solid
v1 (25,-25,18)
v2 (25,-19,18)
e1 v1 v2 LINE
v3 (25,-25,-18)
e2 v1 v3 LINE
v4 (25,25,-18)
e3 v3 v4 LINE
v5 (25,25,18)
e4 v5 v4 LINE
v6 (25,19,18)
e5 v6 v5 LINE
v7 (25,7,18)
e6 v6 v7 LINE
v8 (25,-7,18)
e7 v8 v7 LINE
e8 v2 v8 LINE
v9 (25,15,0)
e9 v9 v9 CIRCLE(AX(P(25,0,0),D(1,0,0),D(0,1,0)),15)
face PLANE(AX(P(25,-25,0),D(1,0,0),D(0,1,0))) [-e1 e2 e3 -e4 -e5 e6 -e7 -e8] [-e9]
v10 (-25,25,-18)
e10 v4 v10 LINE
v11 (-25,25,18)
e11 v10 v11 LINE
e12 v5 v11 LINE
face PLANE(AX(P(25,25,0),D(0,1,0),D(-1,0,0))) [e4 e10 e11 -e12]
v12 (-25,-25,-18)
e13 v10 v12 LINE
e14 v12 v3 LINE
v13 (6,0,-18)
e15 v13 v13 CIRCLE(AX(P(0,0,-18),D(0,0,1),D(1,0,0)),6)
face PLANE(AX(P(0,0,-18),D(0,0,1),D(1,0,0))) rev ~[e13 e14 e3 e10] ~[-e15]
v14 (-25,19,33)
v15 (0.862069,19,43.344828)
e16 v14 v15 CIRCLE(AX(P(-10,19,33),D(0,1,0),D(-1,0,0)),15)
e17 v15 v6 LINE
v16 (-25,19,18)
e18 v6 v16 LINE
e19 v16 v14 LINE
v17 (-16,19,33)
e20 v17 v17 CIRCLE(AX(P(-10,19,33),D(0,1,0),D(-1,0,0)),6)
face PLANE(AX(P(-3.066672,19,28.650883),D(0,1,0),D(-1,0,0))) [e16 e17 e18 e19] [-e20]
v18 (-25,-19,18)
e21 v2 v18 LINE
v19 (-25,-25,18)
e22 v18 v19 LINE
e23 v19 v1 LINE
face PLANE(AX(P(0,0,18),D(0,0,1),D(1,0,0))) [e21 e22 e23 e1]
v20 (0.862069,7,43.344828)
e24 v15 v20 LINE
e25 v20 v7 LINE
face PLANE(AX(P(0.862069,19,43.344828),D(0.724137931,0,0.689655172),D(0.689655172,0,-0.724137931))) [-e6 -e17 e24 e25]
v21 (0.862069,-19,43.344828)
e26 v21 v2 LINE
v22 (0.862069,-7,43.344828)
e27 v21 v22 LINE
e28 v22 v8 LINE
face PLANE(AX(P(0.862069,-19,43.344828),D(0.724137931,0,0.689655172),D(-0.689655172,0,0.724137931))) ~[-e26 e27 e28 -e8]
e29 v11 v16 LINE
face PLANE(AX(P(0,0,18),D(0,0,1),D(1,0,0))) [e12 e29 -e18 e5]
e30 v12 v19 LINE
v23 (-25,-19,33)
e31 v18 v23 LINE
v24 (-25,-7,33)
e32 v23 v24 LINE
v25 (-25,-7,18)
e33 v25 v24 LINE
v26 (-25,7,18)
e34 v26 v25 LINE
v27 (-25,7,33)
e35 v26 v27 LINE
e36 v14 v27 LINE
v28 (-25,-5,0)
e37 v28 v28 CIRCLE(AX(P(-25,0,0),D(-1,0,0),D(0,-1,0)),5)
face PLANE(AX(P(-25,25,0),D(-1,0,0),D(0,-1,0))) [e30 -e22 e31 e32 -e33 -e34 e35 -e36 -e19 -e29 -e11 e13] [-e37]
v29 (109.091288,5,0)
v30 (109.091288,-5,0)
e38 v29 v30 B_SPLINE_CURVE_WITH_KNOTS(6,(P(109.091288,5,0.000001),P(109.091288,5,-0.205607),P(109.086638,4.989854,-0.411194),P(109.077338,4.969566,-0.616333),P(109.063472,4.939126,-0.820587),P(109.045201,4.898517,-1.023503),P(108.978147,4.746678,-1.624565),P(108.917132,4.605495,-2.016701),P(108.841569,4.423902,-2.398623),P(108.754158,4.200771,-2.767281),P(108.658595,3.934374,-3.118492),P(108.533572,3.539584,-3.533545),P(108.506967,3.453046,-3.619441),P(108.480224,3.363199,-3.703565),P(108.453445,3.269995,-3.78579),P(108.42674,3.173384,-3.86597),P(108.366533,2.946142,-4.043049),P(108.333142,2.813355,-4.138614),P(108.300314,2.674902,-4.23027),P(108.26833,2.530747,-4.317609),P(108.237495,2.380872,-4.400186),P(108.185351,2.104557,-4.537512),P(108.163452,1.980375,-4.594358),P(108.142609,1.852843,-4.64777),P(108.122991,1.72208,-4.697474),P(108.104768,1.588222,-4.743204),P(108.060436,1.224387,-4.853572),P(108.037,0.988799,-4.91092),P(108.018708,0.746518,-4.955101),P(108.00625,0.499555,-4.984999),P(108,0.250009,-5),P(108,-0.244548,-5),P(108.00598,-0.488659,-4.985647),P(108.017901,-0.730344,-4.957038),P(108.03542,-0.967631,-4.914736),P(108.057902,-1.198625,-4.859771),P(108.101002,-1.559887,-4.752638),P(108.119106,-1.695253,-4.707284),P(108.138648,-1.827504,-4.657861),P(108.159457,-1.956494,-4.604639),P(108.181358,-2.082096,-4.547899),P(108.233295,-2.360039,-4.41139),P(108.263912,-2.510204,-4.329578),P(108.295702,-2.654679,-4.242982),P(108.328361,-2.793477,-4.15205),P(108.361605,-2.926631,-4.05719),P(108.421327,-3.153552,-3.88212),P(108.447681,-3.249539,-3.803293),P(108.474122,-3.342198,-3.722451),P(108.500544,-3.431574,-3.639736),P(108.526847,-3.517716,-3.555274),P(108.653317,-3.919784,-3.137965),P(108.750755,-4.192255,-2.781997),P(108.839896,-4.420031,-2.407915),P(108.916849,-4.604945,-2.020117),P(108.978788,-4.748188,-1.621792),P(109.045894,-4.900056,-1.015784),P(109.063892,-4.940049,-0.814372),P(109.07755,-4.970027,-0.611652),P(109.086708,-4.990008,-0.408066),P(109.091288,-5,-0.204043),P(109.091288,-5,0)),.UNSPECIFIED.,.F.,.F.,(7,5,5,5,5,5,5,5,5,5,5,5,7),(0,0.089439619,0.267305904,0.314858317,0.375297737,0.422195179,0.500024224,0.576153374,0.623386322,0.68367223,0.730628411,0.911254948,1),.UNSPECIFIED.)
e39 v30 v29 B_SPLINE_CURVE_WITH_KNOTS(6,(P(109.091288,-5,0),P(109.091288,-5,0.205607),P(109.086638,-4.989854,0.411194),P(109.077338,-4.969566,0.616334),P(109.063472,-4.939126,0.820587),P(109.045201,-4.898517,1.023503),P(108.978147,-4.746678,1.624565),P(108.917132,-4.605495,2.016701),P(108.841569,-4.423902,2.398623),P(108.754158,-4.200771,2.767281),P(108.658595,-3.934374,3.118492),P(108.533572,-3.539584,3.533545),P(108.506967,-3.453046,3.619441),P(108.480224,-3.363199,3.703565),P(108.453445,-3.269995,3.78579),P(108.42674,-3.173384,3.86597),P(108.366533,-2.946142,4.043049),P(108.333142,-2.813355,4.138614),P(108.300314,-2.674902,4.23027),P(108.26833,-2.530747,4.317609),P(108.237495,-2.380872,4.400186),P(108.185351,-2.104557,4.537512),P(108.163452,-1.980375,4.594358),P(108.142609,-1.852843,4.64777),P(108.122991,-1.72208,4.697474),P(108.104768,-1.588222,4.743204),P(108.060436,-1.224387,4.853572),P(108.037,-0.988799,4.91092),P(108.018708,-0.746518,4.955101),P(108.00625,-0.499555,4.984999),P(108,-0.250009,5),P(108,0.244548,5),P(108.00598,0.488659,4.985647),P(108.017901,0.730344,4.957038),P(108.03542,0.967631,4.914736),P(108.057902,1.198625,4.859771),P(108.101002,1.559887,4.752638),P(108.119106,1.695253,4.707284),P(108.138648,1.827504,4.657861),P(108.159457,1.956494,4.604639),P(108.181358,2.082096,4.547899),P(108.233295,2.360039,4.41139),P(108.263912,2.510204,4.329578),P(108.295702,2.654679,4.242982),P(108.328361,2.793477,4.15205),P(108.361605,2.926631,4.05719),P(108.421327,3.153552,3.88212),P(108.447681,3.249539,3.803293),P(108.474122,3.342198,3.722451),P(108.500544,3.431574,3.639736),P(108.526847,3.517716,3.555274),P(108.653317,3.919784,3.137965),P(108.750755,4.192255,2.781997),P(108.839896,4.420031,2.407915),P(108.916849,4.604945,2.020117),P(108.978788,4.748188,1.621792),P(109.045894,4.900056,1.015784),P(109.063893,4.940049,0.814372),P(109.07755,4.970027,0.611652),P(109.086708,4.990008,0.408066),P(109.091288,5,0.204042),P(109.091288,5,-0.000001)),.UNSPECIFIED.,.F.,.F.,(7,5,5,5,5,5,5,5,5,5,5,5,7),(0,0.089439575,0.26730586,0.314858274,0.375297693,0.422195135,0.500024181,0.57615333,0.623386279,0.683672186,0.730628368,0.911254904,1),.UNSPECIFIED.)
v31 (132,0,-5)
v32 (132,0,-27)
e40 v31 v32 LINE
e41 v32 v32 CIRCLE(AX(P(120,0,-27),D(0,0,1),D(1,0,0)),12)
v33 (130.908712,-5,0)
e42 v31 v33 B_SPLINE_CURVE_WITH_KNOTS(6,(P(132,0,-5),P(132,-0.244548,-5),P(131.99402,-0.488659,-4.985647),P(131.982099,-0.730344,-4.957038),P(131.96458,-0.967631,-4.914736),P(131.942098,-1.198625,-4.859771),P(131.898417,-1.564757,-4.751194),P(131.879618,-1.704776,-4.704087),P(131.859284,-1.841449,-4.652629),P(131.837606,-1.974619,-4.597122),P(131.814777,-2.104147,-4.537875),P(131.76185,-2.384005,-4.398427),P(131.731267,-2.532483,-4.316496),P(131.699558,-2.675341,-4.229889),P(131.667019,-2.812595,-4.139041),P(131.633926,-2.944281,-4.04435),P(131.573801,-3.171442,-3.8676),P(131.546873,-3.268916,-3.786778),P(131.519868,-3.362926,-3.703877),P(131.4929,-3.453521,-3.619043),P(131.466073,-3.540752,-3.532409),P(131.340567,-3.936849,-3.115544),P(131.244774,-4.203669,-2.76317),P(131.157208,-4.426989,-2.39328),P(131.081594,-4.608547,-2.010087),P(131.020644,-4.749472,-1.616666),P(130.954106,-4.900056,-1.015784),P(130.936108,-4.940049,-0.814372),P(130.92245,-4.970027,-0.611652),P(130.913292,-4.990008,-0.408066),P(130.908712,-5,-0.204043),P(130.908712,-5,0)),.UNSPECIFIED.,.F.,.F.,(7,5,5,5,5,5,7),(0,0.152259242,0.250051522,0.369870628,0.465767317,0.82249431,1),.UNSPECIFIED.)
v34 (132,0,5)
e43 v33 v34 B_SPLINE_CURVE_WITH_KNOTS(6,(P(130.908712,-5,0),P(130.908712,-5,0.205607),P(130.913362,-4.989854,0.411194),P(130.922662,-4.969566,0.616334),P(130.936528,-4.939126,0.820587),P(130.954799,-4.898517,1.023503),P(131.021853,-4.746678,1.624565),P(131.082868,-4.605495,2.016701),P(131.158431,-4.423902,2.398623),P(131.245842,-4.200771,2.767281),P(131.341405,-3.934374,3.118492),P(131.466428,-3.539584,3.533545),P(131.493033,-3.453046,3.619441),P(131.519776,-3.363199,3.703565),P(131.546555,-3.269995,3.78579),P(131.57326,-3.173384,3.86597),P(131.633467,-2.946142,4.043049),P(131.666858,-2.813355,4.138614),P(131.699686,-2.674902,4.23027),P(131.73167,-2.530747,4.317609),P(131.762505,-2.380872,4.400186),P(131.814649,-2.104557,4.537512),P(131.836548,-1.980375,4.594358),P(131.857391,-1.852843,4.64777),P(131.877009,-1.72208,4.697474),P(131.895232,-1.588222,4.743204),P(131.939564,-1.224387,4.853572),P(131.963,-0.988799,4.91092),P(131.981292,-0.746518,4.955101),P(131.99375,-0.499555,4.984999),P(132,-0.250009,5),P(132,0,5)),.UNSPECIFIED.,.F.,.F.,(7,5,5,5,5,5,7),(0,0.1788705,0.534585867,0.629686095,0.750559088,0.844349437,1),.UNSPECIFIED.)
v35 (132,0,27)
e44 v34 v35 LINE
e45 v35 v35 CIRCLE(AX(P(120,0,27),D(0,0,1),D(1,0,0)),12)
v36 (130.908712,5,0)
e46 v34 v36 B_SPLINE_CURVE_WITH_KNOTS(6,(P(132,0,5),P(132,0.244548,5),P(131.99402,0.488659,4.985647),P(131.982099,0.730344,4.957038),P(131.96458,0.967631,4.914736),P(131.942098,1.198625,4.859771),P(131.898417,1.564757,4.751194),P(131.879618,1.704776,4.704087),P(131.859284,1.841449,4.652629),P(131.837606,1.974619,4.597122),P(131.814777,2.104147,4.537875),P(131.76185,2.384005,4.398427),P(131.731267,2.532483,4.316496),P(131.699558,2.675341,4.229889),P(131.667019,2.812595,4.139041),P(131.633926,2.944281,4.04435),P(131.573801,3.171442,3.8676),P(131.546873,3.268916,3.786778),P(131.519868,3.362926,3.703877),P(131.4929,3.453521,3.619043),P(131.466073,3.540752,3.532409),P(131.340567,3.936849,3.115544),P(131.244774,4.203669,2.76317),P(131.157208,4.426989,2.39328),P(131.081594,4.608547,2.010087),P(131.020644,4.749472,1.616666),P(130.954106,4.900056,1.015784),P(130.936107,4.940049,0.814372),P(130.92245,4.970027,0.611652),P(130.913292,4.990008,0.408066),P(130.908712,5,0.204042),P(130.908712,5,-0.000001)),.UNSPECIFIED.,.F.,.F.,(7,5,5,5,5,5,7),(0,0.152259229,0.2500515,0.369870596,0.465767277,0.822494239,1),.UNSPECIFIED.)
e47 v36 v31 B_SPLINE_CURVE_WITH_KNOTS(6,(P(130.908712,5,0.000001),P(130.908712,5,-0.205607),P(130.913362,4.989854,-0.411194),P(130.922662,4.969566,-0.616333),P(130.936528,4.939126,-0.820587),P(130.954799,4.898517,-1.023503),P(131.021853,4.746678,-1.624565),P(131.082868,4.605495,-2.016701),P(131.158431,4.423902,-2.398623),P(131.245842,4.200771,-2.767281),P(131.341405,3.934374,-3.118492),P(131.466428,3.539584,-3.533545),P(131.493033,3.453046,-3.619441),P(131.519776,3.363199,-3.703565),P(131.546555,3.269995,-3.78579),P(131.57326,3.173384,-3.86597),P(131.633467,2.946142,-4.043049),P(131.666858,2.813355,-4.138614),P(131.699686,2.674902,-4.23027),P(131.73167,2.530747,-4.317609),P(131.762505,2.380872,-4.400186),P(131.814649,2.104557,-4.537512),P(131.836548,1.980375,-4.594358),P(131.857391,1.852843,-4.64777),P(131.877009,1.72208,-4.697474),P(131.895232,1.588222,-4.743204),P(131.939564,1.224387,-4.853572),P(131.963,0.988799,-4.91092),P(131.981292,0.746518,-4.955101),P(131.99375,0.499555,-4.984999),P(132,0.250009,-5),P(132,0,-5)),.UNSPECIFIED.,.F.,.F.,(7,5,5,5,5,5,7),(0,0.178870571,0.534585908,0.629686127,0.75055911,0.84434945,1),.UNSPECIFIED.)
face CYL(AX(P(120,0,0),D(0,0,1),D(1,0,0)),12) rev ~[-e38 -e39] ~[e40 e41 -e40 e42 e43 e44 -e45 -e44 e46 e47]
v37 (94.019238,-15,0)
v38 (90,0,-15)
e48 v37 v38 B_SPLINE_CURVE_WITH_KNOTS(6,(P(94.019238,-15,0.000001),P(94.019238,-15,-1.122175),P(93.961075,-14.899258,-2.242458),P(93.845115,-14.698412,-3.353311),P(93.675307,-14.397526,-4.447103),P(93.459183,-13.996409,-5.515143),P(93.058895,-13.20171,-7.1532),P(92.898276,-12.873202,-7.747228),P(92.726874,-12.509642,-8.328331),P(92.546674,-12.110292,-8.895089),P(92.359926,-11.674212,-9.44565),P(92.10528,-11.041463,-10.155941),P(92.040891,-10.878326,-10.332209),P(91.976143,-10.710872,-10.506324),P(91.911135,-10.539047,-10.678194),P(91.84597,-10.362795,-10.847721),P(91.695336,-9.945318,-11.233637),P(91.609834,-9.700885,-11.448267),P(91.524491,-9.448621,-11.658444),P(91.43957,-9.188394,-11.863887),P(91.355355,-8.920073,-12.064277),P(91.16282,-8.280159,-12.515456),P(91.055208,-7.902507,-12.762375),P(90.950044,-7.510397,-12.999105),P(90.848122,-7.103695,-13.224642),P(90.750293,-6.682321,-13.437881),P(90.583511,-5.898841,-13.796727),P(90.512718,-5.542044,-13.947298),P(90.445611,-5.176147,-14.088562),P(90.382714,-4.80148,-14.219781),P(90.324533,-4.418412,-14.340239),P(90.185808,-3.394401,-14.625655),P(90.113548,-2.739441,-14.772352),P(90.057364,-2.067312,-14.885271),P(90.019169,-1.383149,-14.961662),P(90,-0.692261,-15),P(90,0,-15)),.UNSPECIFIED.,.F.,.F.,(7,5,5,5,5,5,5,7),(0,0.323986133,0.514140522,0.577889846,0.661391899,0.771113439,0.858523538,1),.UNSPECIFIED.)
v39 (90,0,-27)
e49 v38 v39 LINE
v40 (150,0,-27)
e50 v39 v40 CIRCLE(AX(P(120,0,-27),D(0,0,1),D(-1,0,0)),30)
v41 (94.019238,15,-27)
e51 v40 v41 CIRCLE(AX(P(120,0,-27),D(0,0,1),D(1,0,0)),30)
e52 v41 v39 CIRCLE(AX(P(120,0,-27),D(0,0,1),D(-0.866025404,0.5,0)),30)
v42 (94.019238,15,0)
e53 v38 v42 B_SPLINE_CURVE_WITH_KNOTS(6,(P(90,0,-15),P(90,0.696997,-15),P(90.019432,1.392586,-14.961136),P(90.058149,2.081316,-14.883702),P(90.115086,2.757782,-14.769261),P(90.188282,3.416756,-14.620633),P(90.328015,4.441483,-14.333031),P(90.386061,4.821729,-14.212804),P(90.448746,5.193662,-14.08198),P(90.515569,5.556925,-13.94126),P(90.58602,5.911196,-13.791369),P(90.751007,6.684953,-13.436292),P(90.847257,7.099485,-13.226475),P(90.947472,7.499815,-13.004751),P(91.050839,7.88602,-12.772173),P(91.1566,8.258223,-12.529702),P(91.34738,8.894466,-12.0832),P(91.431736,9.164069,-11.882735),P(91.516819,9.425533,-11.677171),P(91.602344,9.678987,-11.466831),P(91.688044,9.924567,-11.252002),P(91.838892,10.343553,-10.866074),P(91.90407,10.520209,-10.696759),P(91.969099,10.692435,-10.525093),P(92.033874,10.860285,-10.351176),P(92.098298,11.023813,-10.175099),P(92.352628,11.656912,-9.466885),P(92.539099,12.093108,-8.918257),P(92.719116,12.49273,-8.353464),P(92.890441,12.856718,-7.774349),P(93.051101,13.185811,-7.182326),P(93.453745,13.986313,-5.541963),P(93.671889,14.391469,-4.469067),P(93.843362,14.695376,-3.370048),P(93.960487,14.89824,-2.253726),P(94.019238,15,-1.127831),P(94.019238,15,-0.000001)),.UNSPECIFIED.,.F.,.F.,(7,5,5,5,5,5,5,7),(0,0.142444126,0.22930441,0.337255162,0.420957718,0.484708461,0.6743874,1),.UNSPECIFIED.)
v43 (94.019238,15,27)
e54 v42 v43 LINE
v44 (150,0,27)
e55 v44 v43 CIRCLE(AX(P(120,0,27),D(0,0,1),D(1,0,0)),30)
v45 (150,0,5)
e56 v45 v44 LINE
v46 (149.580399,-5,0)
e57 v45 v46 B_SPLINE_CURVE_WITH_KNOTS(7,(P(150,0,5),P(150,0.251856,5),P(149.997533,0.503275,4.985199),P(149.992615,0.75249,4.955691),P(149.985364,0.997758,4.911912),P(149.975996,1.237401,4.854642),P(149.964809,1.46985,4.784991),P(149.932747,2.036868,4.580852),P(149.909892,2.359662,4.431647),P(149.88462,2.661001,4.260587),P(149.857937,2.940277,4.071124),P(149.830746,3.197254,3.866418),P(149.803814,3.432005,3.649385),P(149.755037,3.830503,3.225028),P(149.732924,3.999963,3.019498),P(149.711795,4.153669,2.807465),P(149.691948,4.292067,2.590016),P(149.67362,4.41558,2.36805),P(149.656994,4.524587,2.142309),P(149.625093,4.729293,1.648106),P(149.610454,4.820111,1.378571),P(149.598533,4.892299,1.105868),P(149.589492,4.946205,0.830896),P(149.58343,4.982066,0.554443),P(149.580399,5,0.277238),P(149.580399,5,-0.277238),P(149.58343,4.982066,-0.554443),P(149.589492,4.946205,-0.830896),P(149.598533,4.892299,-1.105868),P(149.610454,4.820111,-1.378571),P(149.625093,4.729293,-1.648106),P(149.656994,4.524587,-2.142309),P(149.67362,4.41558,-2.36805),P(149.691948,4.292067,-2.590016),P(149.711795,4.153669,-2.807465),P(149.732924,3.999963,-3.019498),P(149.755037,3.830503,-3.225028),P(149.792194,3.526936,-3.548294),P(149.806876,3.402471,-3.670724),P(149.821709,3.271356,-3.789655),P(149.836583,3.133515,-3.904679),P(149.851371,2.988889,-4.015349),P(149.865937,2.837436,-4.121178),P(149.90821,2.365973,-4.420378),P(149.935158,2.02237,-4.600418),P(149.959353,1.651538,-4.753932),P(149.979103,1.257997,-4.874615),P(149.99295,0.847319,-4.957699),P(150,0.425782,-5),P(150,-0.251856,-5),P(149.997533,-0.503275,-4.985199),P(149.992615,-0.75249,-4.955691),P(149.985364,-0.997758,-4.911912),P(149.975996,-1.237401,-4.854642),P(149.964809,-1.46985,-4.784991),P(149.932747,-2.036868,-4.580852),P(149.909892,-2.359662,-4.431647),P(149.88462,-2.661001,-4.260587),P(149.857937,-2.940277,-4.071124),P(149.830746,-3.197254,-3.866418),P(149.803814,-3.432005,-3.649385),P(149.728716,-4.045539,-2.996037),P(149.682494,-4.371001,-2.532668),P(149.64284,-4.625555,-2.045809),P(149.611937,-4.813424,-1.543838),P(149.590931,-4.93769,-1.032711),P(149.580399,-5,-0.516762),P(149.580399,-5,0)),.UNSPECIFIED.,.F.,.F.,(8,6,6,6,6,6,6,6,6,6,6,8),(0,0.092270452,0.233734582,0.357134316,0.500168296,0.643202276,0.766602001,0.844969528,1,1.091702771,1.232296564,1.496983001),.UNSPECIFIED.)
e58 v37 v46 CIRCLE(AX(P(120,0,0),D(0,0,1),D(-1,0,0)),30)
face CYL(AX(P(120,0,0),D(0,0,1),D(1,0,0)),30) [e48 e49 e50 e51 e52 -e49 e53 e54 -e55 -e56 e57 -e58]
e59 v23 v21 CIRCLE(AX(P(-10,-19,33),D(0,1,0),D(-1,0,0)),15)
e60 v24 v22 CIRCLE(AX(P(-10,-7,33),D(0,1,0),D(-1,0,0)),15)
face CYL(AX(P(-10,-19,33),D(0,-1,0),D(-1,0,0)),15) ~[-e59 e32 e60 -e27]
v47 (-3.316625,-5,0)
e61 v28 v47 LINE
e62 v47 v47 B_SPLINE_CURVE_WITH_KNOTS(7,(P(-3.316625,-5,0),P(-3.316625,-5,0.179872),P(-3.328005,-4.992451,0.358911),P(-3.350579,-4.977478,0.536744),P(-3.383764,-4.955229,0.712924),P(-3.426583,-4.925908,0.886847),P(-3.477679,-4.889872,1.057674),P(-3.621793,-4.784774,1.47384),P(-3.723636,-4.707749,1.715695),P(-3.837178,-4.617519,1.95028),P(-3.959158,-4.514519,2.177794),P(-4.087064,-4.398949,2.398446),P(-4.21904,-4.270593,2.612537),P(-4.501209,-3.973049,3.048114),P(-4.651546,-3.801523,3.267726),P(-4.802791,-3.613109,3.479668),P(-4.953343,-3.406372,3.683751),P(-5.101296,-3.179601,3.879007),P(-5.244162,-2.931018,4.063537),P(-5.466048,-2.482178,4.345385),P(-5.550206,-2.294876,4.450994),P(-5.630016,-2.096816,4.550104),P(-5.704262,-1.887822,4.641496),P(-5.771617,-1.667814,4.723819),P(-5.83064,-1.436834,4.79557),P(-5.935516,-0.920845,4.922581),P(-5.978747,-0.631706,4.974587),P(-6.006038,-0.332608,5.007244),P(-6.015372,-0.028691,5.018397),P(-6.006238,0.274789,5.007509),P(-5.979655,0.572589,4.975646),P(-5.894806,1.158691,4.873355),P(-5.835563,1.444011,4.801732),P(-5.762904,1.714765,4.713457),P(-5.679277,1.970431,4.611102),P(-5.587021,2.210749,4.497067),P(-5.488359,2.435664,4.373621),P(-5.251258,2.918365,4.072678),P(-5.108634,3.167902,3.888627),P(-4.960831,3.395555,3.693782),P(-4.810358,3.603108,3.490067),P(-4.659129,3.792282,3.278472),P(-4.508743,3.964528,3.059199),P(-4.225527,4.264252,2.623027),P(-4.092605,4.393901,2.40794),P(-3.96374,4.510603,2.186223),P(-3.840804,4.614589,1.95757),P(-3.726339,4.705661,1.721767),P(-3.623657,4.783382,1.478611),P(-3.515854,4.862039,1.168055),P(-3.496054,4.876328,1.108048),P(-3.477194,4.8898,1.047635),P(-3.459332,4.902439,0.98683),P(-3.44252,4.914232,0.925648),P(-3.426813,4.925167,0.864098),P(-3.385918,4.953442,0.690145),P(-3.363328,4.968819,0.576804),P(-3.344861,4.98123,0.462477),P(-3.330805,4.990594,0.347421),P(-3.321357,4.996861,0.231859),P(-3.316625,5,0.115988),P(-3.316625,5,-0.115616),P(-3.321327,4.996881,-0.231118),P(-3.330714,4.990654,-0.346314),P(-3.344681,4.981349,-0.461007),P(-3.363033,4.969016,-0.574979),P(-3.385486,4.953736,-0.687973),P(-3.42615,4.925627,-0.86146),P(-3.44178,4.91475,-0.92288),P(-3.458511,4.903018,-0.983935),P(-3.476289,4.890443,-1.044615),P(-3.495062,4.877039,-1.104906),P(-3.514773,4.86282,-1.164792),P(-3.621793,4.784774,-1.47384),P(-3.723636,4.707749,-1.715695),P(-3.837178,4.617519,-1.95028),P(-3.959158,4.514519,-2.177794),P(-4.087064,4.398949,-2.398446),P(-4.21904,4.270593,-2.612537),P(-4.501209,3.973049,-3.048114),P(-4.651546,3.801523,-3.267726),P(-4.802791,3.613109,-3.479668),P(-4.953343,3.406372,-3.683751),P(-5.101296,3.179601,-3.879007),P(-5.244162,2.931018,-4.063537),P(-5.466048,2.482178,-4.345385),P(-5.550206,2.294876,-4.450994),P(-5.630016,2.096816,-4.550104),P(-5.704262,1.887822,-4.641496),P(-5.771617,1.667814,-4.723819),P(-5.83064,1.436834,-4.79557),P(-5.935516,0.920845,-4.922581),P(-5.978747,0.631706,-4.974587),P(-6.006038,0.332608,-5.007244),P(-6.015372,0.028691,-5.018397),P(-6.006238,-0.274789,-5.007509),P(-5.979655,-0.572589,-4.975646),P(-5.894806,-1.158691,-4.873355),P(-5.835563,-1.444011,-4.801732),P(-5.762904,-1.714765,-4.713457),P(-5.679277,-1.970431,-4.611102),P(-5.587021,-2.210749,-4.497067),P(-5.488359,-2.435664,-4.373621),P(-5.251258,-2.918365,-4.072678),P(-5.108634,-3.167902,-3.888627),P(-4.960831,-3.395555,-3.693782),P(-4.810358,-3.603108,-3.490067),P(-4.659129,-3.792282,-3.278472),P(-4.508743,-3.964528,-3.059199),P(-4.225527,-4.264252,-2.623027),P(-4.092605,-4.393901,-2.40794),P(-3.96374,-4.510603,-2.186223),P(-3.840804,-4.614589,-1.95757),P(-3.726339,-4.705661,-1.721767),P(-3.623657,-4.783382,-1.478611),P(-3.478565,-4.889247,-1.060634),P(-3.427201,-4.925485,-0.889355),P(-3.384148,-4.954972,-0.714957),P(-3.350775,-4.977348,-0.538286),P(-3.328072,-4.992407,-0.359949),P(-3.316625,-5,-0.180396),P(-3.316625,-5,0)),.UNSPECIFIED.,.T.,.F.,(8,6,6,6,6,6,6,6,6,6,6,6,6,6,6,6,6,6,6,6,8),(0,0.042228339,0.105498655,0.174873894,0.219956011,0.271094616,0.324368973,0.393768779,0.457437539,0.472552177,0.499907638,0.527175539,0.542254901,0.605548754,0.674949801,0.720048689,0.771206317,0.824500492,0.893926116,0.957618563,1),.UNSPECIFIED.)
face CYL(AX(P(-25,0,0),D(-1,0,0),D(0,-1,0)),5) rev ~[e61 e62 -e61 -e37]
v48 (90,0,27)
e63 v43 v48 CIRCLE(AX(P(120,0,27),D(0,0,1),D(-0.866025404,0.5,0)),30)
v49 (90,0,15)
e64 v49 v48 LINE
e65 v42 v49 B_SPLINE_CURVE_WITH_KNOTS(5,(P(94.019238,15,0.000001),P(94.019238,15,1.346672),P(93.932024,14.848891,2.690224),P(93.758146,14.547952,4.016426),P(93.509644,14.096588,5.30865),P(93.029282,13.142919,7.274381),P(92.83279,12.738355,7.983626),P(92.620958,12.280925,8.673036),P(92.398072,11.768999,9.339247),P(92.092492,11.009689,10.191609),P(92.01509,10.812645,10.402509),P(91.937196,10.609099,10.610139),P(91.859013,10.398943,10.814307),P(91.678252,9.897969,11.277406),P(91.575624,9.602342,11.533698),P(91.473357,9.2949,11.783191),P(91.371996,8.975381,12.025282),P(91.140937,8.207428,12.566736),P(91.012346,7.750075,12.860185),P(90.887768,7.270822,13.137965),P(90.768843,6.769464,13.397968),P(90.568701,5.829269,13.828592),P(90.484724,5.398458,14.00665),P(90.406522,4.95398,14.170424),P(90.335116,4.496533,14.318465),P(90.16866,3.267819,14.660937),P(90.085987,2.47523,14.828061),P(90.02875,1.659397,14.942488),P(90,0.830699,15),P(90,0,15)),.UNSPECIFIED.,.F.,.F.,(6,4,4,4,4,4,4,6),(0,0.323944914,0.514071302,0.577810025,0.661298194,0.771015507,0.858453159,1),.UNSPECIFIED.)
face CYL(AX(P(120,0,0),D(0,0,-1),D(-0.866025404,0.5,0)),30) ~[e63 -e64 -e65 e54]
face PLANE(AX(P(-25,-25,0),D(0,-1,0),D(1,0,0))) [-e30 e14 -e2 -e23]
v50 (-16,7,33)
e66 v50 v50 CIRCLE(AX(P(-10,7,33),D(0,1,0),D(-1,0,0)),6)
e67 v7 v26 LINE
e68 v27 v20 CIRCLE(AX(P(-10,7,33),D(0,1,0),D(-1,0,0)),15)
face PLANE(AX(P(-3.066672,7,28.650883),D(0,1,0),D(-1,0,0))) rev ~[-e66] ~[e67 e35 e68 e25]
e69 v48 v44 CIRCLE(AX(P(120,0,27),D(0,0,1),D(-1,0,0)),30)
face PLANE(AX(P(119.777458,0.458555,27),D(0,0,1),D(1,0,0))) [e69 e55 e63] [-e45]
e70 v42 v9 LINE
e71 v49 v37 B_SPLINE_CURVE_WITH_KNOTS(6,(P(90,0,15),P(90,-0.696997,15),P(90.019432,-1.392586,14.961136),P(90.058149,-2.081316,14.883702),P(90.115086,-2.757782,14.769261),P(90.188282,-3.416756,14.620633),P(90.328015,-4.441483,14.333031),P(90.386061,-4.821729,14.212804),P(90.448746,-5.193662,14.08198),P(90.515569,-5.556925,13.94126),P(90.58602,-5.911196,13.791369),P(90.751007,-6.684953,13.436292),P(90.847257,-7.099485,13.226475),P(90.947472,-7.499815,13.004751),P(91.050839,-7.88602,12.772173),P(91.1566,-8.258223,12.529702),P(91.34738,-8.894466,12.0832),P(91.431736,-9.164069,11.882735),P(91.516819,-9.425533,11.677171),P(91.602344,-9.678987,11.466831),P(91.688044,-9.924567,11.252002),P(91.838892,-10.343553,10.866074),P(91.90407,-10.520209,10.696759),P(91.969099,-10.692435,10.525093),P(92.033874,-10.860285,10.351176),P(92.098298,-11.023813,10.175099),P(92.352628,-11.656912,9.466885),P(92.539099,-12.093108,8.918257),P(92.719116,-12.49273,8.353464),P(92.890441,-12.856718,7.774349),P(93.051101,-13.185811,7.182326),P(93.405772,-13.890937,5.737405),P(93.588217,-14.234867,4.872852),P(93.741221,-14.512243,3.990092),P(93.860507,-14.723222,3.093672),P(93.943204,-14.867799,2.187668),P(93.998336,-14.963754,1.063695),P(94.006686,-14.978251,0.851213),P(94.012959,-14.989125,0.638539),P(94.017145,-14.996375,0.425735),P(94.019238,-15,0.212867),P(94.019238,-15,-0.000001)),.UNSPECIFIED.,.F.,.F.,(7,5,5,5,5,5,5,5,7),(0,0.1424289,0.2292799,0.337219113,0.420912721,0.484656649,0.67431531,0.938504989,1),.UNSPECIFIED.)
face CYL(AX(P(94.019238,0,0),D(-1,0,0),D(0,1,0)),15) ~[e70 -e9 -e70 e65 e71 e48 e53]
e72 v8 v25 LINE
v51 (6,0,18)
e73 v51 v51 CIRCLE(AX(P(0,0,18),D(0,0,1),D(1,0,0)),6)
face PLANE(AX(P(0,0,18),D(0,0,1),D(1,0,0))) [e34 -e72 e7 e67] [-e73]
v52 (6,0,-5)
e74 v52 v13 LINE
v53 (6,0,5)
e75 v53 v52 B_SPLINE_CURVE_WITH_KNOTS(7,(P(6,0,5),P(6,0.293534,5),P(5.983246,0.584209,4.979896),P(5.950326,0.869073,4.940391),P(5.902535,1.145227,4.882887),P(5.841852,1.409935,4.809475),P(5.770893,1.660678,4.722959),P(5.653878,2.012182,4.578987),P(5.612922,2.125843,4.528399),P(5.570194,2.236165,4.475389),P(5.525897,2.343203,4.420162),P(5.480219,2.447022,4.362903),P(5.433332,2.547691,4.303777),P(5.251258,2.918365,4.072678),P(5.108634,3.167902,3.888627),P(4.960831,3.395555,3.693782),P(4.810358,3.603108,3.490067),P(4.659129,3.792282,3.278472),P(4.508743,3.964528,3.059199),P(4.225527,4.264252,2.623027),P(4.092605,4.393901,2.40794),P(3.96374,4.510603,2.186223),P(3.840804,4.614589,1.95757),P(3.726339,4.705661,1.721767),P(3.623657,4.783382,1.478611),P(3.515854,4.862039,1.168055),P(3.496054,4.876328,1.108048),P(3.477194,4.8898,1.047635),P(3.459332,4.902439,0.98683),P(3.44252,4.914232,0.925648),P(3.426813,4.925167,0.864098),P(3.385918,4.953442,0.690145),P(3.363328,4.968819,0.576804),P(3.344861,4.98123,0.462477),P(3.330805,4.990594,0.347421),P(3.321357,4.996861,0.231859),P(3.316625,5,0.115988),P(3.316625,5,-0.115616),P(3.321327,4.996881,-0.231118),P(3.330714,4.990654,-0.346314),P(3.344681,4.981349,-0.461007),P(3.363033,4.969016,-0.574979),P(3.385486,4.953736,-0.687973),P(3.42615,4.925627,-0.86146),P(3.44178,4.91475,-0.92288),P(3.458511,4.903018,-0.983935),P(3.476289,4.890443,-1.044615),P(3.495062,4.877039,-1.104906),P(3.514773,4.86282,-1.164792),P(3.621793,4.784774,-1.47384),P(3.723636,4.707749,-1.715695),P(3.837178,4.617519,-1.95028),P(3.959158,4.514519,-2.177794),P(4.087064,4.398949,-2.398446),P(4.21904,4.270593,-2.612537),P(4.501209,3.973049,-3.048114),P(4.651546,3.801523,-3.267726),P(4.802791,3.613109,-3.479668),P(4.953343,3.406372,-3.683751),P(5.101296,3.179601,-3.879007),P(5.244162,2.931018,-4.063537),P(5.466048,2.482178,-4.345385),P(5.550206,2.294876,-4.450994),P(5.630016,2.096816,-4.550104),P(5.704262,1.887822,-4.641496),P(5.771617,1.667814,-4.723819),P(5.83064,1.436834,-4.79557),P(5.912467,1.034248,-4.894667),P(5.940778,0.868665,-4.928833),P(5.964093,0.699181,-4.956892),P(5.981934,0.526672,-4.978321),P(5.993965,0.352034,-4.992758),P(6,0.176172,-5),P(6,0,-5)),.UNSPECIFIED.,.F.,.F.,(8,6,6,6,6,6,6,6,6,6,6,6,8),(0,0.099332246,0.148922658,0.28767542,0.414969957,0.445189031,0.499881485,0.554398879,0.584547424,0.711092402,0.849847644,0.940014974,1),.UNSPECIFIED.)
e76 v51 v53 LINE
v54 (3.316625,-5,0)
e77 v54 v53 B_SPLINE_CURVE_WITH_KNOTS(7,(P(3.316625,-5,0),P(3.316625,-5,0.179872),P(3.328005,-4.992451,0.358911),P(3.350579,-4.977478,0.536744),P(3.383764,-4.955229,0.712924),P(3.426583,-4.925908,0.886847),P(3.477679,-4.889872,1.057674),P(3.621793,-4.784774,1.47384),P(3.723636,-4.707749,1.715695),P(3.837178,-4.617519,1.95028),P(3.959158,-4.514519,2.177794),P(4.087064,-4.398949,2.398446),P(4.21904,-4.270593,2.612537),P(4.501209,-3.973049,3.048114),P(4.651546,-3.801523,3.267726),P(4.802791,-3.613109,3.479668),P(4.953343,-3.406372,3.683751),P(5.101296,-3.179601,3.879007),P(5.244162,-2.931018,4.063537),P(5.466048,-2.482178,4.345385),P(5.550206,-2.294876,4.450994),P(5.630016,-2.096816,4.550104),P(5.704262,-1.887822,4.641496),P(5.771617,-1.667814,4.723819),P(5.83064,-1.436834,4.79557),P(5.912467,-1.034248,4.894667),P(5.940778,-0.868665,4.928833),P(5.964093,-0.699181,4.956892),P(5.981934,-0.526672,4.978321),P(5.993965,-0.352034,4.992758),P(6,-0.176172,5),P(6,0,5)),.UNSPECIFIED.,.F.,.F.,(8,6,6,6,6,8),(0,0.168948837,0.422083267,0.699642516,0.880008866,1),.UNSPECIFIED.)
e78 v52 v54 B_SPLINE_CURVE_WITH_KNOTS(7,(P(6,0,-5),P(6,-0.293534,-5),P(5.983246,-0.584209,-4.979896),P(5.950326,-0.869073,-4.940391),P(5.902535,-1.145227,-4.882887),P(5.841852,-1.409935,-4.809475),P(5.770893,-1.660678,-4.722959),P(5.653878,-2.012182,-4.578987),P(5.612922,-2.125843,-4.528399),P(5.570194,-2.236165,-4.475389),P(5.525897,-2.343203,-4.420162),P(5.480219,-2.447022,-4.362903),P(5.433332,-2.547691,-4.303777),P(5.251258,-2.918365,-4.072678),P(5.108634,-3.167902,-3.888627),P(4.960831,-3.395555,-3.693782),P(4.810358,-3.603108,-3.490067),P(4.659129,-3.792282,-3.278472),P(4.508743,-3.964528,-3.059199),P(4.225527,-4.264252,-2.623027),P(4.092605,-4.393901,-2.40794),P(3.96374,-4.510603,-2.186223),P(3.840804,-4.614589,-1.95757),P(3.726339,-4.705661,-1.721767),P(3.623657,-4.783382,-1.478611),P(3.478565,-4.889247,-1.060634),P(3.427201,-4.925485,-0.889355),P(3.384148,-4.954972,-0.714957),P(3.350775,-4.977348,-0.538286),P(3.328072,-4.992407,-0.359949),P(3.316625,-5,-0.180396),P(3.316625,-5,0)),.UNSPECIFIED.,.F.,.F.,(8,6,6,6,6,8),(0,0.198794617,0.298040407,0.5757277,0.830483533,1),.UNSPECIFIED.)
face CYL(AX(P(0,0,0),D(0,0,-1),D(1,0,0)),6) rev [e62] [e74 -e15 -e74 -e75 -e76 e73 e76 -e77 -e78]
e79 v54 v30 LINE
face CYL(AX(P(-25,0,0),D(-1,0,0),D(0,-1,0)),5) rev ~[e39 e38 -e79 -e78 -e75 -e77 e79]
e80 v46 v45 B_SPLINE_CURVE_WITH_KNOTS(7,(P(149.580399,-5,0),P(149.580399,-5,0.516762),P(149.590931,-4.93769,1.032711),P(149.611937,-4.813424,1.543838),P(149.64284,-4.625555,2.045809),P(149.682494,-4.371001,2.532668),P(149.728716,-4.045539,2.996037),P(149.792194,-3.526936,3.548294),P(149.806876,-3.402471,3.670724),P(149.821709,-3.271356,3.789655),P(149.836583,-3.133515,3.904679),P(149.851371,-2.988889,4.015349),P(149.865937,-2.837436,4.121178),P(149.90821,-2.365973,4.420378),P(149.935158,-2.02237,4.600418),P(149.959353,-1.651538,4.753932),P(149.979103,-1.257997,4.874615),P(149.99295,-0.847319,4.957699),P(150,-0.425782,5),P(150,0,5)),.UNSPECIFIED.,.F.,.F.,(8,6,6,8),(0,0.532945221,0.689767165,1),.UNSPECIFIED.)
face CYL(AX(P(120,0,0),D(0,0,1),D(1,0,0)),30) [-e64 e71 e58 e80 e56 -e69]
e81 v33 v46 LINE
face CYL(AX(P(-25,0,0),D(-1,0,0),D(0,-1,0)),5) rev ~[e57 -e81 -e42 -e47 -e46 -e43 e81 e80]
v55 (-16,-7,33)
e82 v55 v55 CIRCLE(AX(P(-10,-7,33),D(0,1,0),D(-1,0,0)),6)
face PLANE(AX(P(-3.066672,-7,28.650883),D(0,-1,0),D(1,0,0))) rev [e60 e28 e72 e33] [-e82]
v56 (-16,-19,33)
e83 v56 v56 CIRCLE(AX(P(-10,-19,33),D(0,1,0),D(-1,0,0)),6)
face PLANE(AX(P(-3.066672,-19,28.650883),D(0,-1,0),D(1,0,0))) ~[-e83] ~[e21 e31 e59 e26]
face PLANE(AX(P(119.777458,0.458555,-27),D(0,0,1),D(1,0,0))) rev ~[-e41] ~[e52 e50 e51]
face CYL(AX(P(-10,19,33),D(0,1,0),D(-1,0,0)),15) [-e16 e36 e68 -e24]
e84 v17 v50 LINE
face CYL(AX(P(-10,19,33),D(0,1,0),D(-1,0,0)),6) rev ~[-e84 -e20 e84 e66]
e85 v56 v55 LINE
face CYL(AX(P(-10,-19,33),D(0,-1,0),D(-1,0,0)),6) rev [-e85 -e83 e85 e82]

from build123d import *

# Parameters (mm, degrees)
F0_R     = 6
F1_DEPTH = 18
F0_R_2   = 12
F3_DEPTH = 27
F4_R     = 5
F5_DEPTH = 175.0010001
F7_R     = 6
F8_DEPTH = 12


# Not quite as in the source:
# - a pattern or mirror of a feature is missing from the dataset's text; its kind, count and spacing are read off the source's solid


with BuildPart() as f1:
    # F0 (on Top) → F1 (new body, symmetric)
    with BuildSketch(Plane.XY):
        Polygon((25, 15), (25, 25), (-25, 25), (-25, -25), (25, -25), (25, 0), align=None)
        Circle(F0_R, mode=Mode.SUBTRACT)
    extrude(amount=F1_DEPTH, both=True)

    # F0 (on Top) → F2 (revolve)
    with BuildSketch(Plane.XY):
        with BuildLine():
            Line((94.0192378865, 15), (25, 15))
            Line((25, 15), (25, 0))
            Line((25, 0), (90, 0))
            ThreePointArc((90, 0), (91.0222252113, 7.7645713531), (94.0192378865, 15))
        make_face()
    revolve(axis=Axis((57.5, 0, 0), (1, 0, 0)))

    # F0 (on Top) → F3 (join, symmetric)
    with BuildSketch(Plane.XY):
        with BuildLine():
            ThreePointArc((150, 0), (127.7645713531, 28.9777747887), (94.0192378865, 15))
            ThreePointArc((94.0192378865, 15), (91.0222252113, 7.7645713531), (90, 0))
            ThreePointArc((90, 0), (120, -30), (150, 0))
        make_face()
        with Locations((120, 0)):
            Circle(F0_R_2, mode=Mode.SUBTRACT)
    extrude(amount=F3_DEPTH, both=True)

    # F4 (on face) → F5 (cut, through all)
    with BuildSketch(Plane(origin=(-25, 0, 0), x_dir=(0, -1, 0), z_dir=(-1, 0, 0))):
        Circle(F4_R)
    extrude(amount=-F5_DEPTH, mode=Mode.SUBTRACT)

    # F7 (on offset) → F8 (join)
    with BuildSketch(Plane(origin=(0, 19, 0), x_dir=(-1, 0, 0), z_dir=(0, 1, 0))):
        with BuildLine():
            Line((25, 18), (25, 33))
            ThreePointArc((25, 33), (15.5708601453, 46.9271503633), (-0.8620689655, 43.3448275862))
            Line((-0.8620689655, 43.3448275862), (-25, 18))
            Line((-25, 18), (25, 18))
        make_face()
        with Locations((10, 33)):
            Circle(F7_R, mode=Mode.SUBTRACT)
    f8 = extrude(amount=-F8_DEPTH)

    # F8_copies: F8 across plane
    add(f8.mirror(Plane(origin=(0, 0, 0), x_dir=(0, 0, -1), z_dir=(0, -1, 0))))


solid = f1.part
